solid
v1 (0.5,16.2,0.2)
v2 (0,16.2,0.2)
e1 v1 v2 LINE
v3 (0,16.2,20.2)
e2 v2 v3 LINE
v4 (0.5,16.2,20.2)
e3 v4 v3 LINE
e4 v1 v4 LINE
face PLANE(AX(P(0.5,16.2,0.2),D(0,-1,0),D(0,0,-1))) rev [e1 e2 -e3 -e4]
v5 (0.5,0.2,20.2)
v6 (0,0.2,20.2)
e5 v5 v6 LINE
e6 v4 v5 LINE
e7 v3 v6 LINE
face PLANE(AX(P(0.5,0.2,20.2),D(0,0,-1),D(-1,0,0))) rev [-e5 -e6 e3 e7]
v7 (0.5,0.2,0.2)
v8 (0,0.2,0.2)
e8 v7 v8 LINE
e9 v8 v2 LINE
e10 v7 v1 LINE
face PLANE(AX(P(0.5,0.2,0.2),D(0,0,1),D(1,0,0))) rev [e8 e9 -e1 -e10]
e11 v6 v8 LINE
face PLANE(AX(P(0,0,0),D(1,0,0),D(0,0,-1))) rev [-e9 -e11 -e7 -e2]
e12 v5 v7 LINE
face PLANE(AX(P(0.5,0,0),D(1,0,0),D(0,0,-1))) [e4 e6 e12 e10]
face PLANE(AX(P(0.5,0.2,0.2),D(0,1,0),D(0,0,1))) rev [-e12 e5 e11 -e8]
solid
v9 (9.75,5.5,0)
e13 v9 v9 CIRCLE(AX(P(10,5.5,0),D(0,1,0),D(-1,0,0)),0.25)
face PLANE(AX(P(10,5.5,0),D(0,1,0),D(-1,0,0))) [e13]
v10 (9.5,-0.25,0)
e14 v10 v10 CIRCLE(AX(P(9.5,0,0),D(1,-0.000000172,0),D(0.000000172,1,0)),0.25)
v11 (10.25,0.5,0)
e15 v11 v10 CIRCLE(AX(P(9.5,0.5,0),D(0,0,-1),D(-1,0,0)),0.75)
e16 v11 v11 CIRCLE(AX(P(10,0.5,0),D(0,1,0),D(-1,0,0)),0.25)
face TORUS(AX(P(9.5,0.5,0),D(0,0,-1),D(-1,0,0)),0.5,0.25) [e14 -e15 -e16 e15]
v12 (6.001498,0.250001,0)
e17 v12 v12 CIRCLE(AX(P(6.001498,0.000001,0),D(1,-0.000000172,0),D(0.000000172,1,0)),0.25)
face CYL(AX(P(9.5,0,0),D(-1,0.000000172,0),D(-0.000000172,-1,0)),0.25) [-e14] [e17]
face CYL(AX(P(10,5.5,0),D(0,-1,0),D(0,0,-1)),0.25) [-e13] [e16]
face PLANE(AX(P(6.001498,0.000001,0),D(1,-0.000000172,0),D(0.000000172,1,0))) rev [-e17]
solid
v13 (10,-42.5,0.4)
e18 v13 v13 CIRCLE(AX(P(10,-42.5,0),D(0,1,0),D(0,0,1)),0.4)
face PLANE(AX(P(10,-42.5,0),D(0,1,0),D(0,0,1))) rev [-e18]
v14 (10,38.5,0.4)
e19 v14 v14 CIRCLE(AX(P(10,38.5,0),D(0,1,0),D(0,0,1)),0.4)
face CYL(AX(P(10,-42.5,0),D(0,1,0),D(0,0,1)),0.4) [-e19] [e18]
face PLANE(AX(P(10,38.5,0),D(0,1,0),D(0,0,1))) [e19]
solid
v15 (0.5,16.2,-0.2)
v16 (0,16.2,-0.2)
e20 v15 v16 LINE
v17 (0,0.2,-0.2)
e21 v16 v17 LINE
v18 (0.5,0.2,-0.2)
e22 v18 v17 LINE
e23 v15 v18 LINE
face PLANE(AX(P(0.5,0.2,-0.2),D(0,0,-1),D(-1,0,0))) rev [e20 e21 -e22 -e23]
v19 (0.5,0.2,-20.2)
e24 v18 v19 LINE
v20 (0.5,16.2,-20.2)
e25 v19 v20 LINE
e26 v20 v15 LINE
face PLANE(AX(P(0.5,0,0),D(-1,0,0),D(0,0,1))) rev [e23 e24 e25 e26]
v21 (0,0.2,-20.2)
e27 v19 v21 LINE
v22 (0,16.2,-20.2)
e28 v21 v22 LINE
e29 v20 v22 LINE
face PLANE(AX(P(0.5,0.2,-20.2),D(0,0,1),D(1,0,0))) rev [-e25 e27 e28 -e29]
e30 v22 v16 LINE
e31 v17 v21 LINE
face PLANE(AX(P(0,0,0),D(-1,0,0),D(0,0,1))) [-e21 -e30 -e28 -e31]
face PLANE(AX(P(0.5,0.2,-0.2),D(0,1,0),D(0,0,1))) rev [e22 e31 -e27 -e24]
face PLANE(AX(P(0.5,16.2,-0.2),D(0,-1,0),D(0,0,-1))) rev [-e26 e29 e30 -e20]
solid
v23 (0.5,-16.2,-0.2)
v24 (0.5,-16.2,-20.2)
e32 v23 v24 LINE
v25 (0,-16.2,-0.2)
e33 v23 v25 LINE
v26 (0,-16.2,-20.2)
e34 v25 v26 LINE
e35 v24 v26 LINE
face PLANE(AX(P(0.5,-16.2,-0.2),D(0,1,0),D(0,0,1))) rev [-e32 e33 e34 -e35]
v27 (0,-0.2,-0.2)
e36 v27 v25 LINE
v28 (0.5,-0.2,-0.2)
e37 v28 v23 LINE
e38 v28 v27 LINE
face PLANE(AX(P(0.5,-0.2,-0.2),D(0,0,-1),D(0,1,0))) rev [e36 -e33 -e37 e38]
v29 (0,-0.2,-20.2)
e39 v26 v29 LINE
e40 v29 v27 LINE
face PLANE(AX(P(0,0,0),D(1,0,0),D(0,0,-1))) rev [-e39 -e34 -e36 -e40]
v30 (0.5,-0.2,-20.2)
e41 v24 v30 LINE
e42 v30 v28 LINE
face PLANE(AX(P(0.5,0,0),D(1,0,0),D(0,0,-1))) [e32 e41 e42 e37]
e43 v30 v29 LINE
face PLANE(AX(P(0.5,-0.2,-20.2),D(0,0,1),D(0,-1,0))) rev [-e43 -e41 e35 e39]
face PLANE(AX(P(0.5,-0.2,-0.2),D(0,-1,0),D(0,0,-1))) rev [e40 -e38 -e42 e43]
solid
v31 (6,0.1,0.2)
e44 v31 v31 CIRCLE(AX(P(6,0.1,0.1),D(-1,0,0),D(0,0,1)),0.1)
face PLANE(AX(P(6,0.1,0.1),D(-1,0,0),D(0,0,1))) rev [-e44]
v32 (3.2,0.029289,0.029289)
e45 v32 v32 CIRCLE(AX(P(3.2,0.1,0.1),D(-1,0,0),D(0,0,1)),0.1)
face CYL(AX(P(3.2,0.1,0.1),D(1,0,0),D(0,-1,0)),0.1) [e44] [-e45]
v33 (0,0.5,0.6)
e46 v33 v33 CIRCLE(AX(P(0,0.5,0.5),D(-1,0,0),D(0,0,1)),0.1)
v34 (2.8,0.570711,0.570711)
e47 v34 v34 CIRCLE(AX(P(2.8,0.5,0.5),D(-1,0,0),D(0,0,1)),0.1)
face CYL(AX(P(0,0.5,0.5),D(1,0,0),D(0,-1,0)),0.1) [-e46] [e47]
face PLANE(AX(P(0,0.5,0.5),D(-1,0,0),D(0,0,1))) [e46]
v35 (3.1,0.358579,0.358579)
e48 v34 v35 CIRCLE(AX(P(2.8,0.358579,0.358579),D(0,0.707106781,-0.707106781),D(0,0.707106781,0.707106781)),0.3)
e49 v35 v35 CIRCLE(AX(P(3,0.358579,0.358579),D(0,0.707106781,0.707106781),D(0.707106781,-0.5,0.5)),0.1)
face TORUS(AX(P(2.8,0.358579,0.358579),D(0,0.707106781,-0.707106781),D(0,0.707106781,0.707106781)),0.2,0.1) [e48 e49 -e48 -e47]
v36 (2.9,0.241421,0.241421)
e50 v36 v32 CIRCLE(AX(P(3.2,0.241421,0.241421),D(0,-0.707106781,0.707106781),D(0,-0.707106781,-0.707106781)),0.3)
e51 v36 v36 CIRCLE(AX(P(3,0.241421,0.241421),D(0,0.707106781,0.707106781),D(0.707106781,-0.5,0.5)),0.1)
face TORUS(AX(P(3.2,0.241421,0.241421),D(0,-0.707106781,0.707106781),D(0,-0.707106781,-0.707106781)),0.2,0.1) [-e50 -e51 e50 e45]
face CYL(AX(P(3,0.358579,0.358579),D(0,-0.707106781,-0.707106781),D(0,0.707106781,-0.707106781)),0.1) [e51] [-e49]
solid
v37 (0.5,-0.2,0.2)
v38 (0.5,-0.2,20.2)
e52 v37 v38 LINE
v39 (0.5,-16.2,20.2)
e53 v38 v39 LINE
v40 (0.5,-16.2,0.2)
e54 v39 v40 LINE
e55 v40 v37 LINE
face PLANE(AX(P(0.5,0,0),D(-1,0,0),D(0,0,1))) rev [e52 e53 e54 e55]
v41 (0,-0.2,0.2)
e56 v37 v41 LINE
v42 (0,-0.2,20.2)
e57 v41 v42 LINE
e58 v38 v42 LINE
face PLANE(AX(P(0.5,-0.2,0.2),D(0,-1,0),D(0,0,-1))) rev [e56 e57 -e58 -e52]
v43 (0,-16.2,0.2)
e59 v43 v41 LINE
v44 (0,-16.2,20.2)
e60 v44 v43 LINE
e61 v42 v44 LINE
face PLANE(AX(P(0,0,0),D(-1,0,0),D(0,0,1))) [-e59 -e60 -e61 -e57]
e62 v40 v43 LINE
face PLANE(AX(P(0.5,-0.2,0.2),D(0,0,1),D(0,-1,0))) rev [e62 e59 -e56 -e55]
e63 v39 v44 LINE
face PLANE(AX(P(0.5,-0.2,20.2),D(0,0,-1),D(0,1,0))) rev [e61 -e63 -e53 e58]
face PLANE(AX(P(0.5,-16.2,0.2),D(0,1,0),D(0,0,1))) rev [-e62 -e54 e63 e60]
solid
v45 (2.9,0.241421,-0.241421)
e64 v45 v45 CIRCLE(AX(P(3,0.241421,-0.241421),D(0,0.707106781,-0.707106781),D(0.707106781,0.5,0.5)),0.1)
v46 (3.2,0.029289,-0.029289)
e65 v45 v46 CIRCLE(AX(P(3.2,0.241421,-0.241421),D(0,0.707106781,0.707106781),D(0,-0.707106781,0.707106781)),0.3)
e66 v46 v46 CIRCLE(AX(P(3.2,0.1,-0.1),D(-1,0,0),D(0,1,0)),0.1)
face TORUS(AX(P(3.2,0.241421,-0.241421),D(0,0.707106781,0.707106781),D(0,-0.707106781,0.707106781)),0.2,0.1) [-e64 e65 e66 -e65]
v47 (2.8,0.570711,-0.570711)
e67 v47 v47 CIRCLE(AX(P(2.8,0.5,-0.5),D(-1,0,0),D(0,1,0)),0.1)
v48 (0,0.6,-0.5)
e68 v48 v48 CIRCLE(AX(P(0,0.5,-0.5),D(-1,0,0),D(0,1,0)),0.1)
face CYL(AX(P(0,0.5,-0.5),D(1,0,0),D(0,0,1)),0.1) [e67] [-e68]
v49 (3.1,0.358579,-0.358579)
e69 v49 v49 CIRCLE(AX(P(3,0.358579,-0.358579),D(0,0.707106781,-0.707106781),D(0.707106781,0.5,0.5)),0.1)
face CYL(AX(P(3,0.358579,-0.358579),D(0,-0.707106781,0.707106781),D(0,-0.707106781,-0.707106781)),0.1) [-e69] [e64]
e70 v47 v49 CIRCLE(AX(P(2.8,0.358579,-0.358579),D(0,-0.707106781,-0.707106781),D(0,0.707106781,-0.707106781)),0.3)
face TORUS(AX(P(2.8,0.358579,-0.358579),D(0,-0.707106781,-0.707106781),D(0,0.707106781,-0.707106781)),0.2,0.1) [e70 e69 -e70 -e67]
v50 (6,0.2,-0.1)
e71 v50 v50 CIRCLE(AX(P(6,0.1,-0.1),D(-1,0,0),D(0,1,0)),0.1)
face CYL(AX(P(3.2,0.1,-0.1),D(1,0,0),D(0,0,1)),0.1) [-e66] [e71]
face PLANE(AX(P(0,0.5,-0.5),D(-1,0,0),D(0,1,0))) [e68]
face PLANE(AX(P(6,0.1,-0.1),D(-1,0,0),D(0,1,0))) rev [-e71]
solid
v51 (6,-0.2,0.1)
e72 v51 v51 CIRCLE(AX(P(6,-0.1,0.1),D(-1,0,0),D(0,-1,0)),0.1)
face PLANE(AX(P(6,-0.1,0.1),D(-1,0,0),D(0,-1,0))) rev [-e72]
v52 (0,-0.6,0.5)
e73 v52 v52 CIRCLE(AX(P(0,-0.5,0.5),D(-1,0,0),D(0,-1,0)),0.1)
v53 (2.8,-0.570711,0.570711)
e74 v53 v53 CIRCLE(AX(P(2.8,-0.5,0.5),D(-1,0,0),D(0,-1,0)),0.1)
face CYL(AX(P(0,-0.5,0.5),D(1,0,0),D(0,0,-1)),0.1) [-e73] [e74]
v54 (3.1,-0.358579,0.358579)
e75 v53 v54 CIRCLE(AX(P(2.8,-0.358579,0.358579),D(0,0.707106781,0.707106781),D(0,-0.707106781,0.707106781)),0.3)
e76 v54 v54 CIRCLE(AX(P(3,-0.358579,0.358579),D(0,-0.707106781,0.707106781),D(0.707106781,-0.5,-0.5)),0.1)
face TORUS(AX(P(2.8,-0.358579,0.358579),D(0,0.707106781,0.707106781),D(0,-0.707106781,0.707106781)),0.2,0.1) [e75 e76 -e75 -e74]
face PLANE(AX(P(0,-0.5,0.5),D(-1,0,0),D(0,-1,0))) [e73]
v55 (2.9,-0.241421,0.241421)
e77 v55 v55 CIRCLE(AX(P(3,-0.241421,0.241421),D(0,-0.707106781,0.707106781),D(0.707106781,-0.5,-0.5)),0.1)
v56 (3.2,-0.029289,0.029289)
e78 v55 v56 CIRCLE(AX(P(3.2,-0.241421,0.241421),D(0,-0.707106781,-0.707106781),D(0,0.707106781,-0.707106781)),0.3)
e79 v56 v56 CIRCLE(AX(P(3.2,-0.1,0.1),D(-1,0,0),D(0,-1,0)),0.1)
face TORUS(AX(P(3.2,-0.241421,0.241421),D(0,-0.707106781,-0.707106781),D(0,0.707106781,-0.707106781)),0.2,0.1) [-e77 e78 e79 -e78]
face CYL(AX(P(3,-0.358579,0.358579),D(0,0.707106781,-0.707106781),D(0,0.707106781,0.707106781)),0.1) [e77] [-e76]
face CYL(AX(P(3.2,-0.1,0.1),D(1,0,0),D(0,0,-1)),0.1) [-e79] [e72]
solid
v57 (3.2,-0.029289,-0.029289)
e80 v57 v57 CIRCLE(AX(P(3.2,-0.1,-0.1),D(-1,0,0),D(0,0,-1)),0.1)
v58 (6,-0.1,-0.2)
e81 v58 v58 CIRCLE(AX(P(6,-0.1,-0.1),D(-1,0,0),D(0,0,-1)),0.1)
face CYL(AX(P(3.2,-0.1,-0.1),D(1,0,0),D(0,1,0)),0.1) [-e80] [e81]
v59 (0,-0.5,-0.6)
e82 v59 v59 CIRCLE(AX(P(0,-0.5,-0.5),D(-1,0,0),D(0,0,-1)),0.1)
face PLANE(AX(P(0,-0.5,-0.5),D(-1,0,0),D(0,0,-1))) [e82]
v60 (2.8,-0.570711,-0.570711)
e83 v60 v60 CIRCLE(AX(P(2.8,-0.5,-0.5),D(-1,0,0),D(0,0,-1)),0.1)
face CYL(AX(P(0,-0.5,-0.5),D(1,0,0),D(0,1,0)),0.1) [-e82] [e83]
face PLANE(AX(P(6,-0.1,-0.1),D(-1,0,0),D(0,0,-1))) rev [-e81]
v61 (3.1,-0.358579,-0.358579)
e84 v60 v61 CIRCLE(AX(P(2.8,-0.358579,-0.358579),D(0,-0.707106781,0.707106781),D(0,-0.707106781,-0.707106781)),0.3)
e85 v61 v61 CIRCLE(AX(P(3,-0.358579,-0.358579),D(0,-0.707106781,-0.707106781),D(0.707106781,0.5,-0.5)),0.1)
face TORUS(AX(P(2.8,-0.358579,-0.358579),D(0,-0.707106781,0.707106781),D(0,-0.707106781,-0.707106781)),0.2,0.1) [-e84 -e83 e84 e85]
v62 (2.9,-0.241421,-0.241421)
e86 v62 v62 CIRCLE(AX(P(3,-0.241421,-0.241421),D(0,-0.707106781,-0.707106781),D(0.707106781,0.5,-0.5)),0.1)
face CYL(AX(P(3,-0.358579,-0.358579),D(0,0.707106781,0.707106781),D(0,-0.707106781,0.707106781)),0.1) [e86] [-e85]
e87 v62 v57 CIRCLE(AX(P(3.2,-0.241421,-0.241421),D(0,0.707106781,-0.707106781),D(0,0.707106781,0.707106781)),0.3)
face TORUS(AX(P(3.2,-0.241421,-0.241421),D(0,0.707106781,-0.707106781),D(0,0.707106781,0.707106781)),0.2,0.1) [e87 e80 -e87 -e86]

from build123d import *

# Parameters (mm, degrees)
SKETCH_3_W               = 20
SKETCH_3_H               = 16
EXTRUDE_1_DEPTH          = 0.5
EXTRUDE_1_2_DEPTH        = 0.5
EXTRUDE_1_3_DEPTH        = 0.5
EXTRUDE_1_4_DEPTH        = 0.5
SWEEP_4_PROFILE_R        = 0.1
SWEEP_6_PROFILE_R        = 0.25
SWEEP_8_PROFILE_R        = 0.4
MOVE_BODY_3_OUTLINE_R    = 0.1
MOVE_BODY_3_ANGLE        = 90
MOVE_BODY_3_2_OUTLINE_R  = 0.1
MOVE_BODY_3_2_ANGLE      = 90
MOVE_BODY_3_3_OUTLINE_R  = 0.1
MOVE_BODY_3_3_DEPTH      = 2.8000001
MOVE_START               = 0.341421256
MOVE_BODY_3_4_OUTLINE_R  = 0.1
MOVE_BODY_3_4_DEPTH      = 0.165685625
MOVE_START_2             = 3.1999999
MOVE_BODY_3_5_OUTLINE_R  = 0.1
MOVE_BODY_3_5_DEPTH      = 2.8000001
MOVE_BODY_3_6_OUTLINE_R  = 0.1
MOVE_BODY_3_6_ANGLE      = 90
MOVE_BODY_3_7_OUTLINE_R  = 0.1
MOVE_BODY_3_7_ANGLE      = 90
MOVE_BODY_3_8_OUTLINE_R  = 0.1
MOVE_BODY_3_8_DEPTH      = 2.8000001
MOVE_BODY_3_9_OUTLINE_R  = 0.1
MOVE_BODY_3_9_DEPTH      = 0.165685625
MOVE_BODY_3_10_OUTLINE_R = 0.1
MOVE_BODY_3_10_DEPTH     = 2.8000001
MOVE_BODY_3_11_OUTLINE_R = 0.1
MOVE_BODY_3_11_ANGLE     = 90
MOVE_BODY_3_12_OUTLINE_R = 0.1
MOVE_BODY_3_12_ANGLE     = 90
MOVE_BODY_3_13_OUTLINE_R = 0.1
MOVE_BODY_3_13_DEPTH     = 2.8000001
MOVE_START_3             = -0.507106881
MOVE_BODY_3_14_OUTLINE_R = 0.1
MOVE_BODY_3_14_DEPTH     = 0.165685625
MOVE_BODY_3_15_OUTLINE_R = 0.1
MOVE_BODY_3_15_DEPTH     = 2.8000001


with BuildPart() as part:
    # 草图3 → 凸台-拉伸1 (new body)
    with BuildSketch(Plane(origin=(0, 0, 0), x_dir=(0, 0, -1), z_dir=(1, 0, 0))):
        with Locations((10.2, 8.2)):
            Rectangle(SKETCH_3_W, SKETCH_3_H)
    extrude(amount=EXTRUDE_1_DEPTH)


with BuildPart() as body_2:
    # 草图3 → Extrude 1 2 (new body)
    with BuildSketch(Plane(origin=(0, 0, 0), x_dir=(0, 0, -1), z_dir=(1, 0, 0))):
        with Locations((-10.2, -8.2)):
            Rectangle(SKETCH_3_W, SKETCH_3_H)
    extrude(amount=EXTRUDE_1_2_DEPTH)


with BuildPart() as body_3:
    # 草图3 → Extrude 1 3 (new body)
    with BuildSketch(Plane(origin=(0, 0, 0), x_dir=(0, 0, -1), z_dir=(1, 0, 0))):
        with Locations((10.2, -8.2)):
            Rectangle(SKETCH_3_W, SKETCH_3_H)
    extrude(amount=EXTRUDE_1_3_DEPTH)


with BuildPart() as body_4:
    # 草图3 → Extrude 1 4 (new body)
    with BuildSketch(Plane(origin=(0, 0, 0), x_dir=(0, 0, -1), z_dir=(1, 0, 0))):
        with Locations((-10.2, 8.2)):
            Rectangle(SKETCH_3_W, SKETCH_3_H)
    extrude(amount=EXTRUDE_1_4_DEPTH)


with BuildPart() as body_5:
    # 扫描4: sweep along a curve in space
    with BuildLine() as sweep_4_path:
        Line((0, -0.5, 0.5), (2.8, -0.5, 0.5))
        ThreePointArc((2.8, -0.5, 0.5), (2.941421356, -0.458578644, 0.458578644), (3, -0.358578644, 0.358578644))
        Line((3, -0.241421356, 0.241421356), (3, -0.358578644, 0.358578644))
        ThreePointArc((3.2, -0.1, 0.1), (3.058578644, -0.141421356, 0.141421356), (3, -0.241421356, 0.241421356))
        Line((3.2, -0.1, 0.1), (6, -0.1, 0.1))
    # 扫描4 profile (on start of the path) → 扫描4 (sweep)
    with BuildSketch(Plane(origin=(0, -0.5, 0.5), x_dir=(0, 0, 1), z_dir=(1, 0, 0))):
        Circle(SWEEP_4_PROFILE_R)
    sweep(path=sweep_4_path.line)


with BuildPart() as body_6:
    # 扫描6: sweep along a path in 草图31
    with BuildLine(Plane.XY) as sweep_6_path:
        Line((10, 5.5), (10, 0.5))
        ThreePointArc((10, 0.5), (9.85355336, 0.146446579), (9.499999914, 0))
        Line((9.499999914, 0), (6.001497631, 6.02e-07))
    # 扫描6 profile (on start of the path) → 扫描6 (sweep)
    with BuildSketch(Plane(origin=(10, 5.5, 0), x_dir=(0, 0, -1), z_dir=(0, -1, 0))):
        Circle(SWEEP_6_PROFILE_R)
    sweep(path=sweep_6_path.line)


with BuildPart() as body_7:
    # 扫描8: sweep along a path in 草图39
    with BuildLine(Plane.XY) as sweep_8_path:
        Line((10, -42.5), (10, 38.5))
    # 扫描8 profile (on start of the path) → 扫描8 (sweep)
    with BuildSketch(Plane(origin=(10, -42.5, 0), x_dir=(0, 0, 1), z_dir=(0, 1, 0))):
        Circle(SWEEP_8_PROFILE_R)
    sweep(path=sweep_8_path.line)


with BuildPart() as body_8:
    # Move Body 3: read off the stored shape, not the designer's step
    # Move Body 3 outline → Move Body 3 (revolve)
    with BuildSketch(Plane(origin=(2.8, 0.358578644, 0.358578644), x_dir=(0, 0.7071067811865401, 0.7071067811865551), z_dir=(-1, 0, 0))):
        with Locations((0.2, 0)):
            Circle(MOVE_BODY_3_OUTLINE_R)
    revolve(axis=Axis((2.8, 0.358578644, 0.358578644), (0, 0.7071067811865555, -0.7071067811865405)), revolution_arc=MOVE_BODY_3_ANGLE)

    # Move Body 3 2 outline → Move Body 3 2 (revolve)
    with BuildSketch(Plane(origin=(3.2, 0.241421356, 0.241421356), x_dir=(1.3934999695075554e-15, -0.7071067811865401, -0.7071067811865551), z_dir=(1, 0, 0))):
        with Locations((0.2, 0)):
            Circle(MOVE_BODY_3_2_OUTLINE_R)
    revolve(axis=Axis((3.2, 0.241421356, 0.241421356), (0, 0.7071067811865555, -0.7071067811865405)), revolution_arc=MOVE_BODY_3_2_ANGLE)

    # Move Body 3 3 outline → Move Body 3 3 (add)
    with BuildSketch(Plane.YZ):
        with Locations((0.5, 0.5)):
            Circle(MOVE_BODY_3_3_OUTLINE_R)
    extrude(amount=MOVE_BODY_3_3_DEPTH)

    # Move Body 3 4 outline → Move Body 3 4 (add)
    with BuildSketch(Plane(origin=(0, 0, 0), x_dir=(1, 0, 0), z_dir=(0, 0.70710678118654, 0.707106781186555)).offset(MOVE_START)):
        with Locations((3, 0)):
            Circle(MOVE_BODY_3_4_OUTLINE_R)
    extrude(amount=MOVE_BODY_3_4_DEPTH)

    # Move Body 3 5 outline → Move Body 3 5 (add)
    with BuildSketch(Plane.YZ.offset(MOVE_START_2)):
        with Locations((0.1, 0.1)):
            Circle(MOVE_BODY_3_5_OUTLINE_R)
    extrude(amount=MOVE_BODY_3_5_DEPTH)


with BuildPart() as body_9:
    # Move Body 3 6 outline → Move Body 3 6 (revolve)
    with BuildSketch(Plane(origin=(2.8, 0.358578644, -0.358578644), x_dir=(1, 0, 0), z_dir=(0, -0.707106781186552, 0.707106781186543))):
        with Locations((0.2, 0)):
            Circle(MOVE_BODY_3_6_OUTLINE_R)
    revolve(axis=Axis((2.8, 0.358578644, -0.358578644), (0, 0.707106781186543, 0.707106781186552)), revolution_arc=MOVE_BODY_3_6_ANGLE)

    # Move Body 3 7 outline → Move Body 3 7 (revolve)
    with BuildSketch(Plane(origin=(3.2, 0.241421356, -0.241421356), x_dir=(-1, 0, 0), z_dir=(-1.0106430996148604e-15, 0.707106781186552, -0.707106781186543))):
        with Locations((0.2, 0)):
            Circle(MOVE_BODY_3_7_OUTLINE_R)
    revolve(axis=Axis((3.2, 0.241421356, -0.241421356), (0, 0.707106781186543, 0.707106781186552)), revolution_arc=MOVE_BODY_3_7_ANGLE)

    # Move Body 3 8 outline → Move Body 3 8 (add)
    with BuildSketch(Plane.YZ):
        with Locations((0.5, -0.5)):
            Circle(MOVE_BODY_3_8_OUTLINE_R)
    extrude(amount=MOVE_BODY_3_8_DEPTH)

    # Move Body 3 9 outline → Move Body 3 9 (add)
    with BuildSketch(Plane(origin=(0, 0, 0), x_dir=(1, 0, 0), z_dir=(0, 0.707106781186552, -0.707106781186543)).offset(MOVE_START)):
        with Locations((3, 0)):
            Circle(MOVE_BODY_3_9_OUTLINE_R)
    extrude(amount=MOVE_BODY_3_9_DEPTH)

    # Move Body 3 10 outline → Move Body 3 10 (add)
    with BuildSketch(Plane.YZ.offset(MOVE_START_2)):
        with Locations((0.1, -0.1)):
            Circle(MOVE_BODY_3_10_OUTLINE_R)
    extrude(amount=MOVE_BODY_3_10_DEPTH)


with BuildPart() as body_10:
    # Move Body 3 11 outline → Move Body 3 11 (revolve)
    with BuildSketch(Plane(origin=(2.8, -0.358578644, -0.358578644), x_dir=(1, 0, 0), z_dir=(0, 0.707106781186545, 0.70710678118655))):
        with Locations((0.2, 0)):
            Circle(MOVE_BODY_3_11_OUTLINE_R)
    revolve(axis=Axis((2.8, -0.358578644, -0.358578644), (0, 0.70710678118655, -0.707106781186545)), revolution_arc=MOVE_BODY_3_11_ANGLE)

    # Move Body 3 12 outline → Move Body 3 12 (revolve)
    with BuildSketch(Plane(origin=(3.2, -0.241421356, -0.241421356), x_dir=(-1, 0, 0), z_dir=(-1.0106430996148606e-15, -0.707106781186545, -0.70710678118655))):
        with Locations((0.2, 0)):
            Circle(MOVE_BODY_3_12_OUTLINE_R)
    revolve(axis=Axis((3.2, -0.241421356, -0.241421356), (0, 0.70710678118655, -0.707106781186545)), revolution_arc=MOVE_BODY_3_12_ANGLE)

    # Move Body 3 13 outline → Move Body 3 13 (add)
    with BuildSketch(Plane.YZ):
        with Locations((-0.5, -0.5)):
            Circle(MOVE_BODY_3_13_OUTLINE_R)
    extrude(amount=MOVE_BODY_3_13_DEPTH)

    # Move Body 3 14 outline → Move Body 3 14 (add)
    with BuildSketch(Plane(origin=(0, 0, 0), x_dir=(1, 0, 0), z_dir=(0, 0.707106781186545, 0.70710678118655)).offset(MOVE_START_3)):
        with Locations((3, 0)):
            Circle(MOVE_BODY_3_14_OUTLINE_R)
    extrude(amount=MOVE_BODY_3_14_DEPTH)

    # Move Body 3 15 outline → Move Body 3 15 (add)
    with BuildSketch(Plane.YZ.offset(MOVE_START_2)):
        with Locations((-0.1, -0.1)):
            Circle(MOVE_BODY_3_15_OUTLINE_R)
    extrude(amount=MOVE_BODY_3_15_DEPTH)


solid = Compound([part.part, body_2.part, body_3.part, body_4.part, body_5.part, body_6.part, body_7.part, body_8.part, body_9.part, body_10.part])
